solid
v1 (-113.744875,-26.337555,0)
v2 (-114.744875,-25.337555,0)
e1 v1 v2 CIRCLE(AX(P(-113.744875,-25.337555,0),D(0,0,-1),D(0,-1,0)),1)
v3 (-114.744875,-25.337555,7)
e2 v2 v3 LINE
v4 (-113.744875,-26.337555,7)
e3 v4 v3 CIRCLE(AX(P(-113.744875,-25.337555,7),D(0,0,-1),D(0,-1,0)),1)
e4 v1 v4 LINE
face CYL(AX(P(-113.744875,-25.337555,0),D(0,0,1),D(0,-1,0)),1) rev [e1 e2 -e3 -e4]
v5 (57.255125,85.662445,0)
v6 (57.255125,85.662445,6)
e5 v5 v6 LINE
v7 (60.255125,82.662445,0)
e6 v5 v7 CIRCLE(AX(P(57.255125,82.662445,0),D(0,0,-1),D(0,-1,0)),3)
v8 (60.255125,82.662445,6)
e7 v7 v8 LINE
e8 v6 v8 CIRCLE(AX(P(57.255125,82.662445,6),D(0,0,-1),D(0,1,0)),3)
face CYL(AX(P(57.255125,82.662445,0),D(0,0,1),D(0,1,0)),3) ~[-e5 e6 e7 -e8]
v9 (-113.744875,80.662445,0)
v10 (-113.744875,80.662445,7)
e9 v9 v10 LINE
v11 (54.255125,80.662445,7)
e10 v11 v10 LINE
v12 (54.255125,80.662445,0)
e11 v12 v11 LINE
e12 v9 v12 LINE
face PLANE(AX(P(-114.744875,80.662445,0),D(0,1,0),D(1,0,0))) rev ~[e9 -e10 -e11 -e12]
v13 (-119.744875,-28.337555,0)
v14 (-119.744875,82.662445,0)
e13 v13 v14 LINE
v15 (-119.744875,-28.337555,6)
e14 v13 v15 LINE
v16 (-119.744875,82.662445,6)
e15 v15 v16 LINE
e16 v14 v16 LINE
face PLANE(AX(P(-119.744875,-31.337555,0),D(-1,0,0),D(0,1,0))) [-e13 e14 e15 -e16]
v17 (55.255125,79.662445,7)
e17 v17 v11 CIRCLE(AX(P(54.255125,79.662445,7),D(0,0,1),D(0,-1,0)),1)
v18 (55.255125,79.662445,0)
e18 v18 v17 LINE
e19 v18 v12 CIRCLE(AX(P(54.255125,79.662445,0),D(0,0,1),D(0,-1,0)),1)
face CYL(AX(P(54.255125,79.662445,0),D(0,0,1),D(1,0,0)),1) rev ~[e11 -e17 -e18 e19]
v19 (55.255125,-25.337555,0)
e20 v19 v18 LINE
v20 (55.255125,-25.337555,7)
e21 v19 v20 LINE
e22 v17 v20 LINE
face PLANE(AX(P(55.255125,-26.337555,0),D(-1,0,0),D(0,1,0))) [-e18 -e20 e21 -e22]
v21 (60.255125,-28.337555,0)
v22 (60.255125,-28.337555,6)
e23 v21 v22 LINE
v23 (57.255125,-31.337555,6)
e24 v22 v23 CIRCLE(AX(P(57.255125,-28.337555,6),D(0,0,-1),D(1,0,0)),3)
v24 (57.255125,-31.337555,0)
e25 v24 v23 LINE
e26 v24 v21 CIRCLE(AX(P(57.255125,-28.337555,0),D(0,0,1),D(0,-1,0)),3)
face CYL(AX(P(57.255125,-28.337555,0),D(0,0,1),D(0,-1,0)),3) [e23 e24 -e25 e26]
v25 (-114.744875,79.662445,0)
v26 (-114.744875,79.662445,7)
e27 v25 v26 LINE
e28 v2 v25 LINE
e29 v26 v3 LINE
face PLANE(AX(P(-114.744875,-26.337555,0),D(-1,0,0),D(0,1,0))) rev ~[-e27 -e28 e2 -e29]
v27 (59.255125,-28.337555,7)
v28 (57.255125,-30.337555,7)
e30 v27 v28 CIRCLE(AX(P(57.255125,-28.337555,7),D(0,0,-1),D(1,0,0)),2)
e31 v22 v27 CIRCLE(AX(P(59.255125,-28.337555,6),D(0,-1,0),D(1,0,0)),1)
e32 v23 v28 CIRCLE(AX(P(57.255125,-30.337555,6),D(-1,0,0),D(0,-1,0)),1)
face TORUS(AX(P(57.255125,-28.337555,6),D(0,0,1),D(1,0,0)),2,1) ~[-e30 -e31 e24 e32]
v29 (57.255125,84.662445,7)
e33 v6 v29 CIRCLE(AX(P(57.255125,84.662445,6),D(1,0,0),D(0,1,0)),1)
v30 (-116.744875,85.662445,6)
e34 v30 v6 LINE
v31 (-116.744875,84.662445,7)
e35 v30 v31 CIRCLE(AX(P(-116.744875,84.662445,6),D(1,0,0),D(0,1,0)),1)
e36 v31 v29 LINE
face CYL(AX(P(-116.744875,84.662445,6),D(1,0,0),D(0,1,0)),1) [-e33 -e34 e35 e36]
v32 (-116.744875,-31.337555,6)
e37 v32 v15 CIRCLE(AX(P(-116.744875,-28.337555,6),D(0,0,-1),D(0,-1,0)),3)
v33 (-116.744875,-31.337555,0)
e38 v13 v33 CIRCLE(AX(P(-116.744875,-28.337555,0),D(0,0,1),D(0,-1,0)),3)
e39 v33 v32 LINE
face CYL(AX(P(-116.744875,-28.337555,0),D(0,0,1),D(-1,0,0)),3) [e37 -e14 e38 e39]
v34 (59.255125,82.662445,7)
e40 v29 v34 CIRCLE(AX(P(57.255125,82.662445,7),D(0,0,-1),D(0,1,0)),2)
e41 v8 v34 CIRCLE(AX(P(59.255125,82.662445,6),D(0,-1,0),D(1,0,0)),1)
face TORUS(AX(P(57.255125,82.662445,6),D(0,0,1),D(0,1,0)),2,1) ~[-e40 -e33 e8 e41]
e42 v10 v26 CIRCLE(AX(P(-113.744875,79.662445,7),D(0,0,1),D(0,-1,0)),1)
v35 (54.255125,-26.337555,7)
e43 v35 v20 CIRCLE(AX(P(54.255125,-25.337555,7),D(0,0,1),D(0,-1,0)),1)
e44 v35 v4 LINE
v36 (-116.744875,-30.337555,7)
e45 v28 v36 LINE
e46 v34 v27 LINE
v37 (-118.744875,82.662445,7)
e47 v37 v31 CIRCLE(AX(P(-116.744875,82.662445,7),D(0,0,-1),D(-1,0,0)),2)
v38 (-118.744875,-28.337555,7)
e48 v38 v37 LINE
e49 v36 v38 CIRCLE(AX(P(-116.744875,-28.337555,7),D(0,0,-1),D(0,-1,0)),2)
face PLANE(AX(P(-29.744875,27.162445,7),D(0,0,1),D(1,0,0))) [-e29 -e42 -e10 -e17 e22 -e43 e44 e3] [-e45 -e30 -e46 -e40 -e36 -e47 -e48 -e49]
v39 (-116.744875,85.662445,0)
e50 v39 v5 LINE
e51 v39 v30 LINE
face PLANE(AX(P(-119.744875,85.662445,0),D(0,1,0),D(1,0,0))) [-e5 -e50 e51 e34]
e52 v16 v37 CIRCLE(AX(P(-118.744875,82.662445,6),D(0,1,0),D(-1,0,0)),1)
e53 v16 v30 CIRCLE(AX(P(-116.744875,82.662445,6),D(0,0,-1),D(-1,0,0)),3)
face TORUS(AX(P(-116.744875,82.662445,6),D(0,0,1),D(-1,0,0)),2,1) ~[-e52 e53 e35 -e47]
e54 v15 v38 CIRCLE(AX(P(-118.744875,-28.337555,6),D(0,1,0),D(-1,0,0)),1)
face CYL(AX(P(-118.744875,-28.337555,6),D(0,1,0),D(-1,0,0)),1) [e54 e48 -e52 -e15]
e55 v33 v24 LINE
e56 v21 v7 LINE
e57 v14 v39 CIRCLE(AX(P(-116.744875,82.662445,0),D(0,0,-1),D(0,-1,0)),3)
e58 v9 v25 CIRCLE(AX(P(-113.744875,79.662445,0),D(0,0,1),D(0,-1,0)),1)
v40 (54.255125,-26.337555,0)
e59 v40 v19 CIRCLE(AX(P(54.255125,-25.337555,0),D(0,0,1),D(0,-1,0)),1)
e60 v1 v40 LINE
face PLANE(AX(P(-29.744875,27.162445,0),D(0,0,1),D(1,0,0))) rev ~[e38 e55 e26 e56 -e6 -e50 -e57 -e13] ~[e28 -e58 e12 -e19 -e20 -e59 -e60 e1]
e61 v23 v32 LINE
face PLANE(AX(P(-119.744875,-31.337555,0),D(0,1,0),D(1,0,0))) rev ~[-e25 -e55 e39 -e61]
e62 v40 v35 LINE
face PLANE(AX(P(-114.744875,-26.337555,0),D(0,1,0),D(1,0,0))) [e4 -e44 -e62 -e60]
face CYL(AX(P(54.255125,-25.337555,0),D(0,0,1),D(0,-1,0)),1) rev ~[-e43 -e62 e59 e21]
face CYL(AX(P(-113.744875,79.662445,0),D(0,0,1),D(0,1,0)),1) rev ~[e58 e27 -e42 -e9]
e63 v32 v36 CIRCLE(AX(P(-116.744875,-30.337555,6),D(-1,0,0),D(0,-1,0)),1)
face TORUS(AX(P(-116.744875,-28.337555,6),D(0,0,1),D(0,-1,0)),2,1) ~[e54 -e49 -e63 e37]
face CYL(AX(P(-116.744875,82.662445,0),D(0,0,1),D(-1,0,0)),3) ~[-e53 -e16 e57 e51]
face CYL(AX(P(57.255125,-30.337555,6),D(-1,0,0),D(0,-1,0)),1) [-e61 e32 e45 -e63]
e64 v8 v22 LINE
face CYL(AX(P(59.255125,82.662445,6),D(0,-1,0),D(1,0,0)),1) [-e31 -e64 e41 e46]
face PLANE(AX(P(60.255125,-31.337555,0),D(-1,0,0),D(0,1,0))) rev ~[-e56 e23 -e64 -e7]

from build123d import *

# Parameters (mm, degrees)
F0_W     = 180
F0_H     = 117
F2_DEPTH = 7
F1_W     = 170
F1_H     = 107
F3_DEPTH = 25
F4_R     = 3
F5_R     = 1
F6_R     = 1


with BuildPart() as f2:
    # F0 (on Top) → F2 (new body)
    with BuildSketch(Plane.XY):
        with Locations((-29.744874835, 27.1624445021)):
            Rectangle(F0_W, F0_H)
    extrude(amount=F2_DEPTH)

    # F1 (on face) → F3 (cut)
    with BuildSketch(Plane.XY):
        with Locations((-29.744874835, 27.1624445021)):
            Rectangle(F1_W, F1_H)
    extrude(amount=F3_DEPTH, mode=Mode.SUBTRACT)

    # F4
    f4_edges = [f2.edges().sort_by_distance(p)[0] for p in [
        (60.255125, 85.662445, 3.5),
        (60.255125, -31.337555, 3.5),
        (-119.744875, -31.337555, 3.5),
        (-119.744875, 85.662445, 3.5),
    ]]
    fillet(f4_edges, radius=F4_R)

    # F5
    f5_edges = [f2.edges().sort_by_distance(p)[0] for p in [
        (-119.744875, 27.162445, 7),
        (-29.744875, -31.337555, 7),
        (-118.866195, -30.458876, 7),
    ]]
    fillet(f5_edges, radius=F5_R)

    # F6
    f6_edges = [f2.edges().sort_by_distance(p)[0] for p in [
        (55.255125, -26.337555, 3.5),
        (55.255125, 80.662445, 3.5),
        (-114.744875, 80.662445, 3.5),
        (-114.744875, -26.337555, 3.5),
    ]]
    fillet(f6_edges, radius=F6_R)


solid = f2.part
